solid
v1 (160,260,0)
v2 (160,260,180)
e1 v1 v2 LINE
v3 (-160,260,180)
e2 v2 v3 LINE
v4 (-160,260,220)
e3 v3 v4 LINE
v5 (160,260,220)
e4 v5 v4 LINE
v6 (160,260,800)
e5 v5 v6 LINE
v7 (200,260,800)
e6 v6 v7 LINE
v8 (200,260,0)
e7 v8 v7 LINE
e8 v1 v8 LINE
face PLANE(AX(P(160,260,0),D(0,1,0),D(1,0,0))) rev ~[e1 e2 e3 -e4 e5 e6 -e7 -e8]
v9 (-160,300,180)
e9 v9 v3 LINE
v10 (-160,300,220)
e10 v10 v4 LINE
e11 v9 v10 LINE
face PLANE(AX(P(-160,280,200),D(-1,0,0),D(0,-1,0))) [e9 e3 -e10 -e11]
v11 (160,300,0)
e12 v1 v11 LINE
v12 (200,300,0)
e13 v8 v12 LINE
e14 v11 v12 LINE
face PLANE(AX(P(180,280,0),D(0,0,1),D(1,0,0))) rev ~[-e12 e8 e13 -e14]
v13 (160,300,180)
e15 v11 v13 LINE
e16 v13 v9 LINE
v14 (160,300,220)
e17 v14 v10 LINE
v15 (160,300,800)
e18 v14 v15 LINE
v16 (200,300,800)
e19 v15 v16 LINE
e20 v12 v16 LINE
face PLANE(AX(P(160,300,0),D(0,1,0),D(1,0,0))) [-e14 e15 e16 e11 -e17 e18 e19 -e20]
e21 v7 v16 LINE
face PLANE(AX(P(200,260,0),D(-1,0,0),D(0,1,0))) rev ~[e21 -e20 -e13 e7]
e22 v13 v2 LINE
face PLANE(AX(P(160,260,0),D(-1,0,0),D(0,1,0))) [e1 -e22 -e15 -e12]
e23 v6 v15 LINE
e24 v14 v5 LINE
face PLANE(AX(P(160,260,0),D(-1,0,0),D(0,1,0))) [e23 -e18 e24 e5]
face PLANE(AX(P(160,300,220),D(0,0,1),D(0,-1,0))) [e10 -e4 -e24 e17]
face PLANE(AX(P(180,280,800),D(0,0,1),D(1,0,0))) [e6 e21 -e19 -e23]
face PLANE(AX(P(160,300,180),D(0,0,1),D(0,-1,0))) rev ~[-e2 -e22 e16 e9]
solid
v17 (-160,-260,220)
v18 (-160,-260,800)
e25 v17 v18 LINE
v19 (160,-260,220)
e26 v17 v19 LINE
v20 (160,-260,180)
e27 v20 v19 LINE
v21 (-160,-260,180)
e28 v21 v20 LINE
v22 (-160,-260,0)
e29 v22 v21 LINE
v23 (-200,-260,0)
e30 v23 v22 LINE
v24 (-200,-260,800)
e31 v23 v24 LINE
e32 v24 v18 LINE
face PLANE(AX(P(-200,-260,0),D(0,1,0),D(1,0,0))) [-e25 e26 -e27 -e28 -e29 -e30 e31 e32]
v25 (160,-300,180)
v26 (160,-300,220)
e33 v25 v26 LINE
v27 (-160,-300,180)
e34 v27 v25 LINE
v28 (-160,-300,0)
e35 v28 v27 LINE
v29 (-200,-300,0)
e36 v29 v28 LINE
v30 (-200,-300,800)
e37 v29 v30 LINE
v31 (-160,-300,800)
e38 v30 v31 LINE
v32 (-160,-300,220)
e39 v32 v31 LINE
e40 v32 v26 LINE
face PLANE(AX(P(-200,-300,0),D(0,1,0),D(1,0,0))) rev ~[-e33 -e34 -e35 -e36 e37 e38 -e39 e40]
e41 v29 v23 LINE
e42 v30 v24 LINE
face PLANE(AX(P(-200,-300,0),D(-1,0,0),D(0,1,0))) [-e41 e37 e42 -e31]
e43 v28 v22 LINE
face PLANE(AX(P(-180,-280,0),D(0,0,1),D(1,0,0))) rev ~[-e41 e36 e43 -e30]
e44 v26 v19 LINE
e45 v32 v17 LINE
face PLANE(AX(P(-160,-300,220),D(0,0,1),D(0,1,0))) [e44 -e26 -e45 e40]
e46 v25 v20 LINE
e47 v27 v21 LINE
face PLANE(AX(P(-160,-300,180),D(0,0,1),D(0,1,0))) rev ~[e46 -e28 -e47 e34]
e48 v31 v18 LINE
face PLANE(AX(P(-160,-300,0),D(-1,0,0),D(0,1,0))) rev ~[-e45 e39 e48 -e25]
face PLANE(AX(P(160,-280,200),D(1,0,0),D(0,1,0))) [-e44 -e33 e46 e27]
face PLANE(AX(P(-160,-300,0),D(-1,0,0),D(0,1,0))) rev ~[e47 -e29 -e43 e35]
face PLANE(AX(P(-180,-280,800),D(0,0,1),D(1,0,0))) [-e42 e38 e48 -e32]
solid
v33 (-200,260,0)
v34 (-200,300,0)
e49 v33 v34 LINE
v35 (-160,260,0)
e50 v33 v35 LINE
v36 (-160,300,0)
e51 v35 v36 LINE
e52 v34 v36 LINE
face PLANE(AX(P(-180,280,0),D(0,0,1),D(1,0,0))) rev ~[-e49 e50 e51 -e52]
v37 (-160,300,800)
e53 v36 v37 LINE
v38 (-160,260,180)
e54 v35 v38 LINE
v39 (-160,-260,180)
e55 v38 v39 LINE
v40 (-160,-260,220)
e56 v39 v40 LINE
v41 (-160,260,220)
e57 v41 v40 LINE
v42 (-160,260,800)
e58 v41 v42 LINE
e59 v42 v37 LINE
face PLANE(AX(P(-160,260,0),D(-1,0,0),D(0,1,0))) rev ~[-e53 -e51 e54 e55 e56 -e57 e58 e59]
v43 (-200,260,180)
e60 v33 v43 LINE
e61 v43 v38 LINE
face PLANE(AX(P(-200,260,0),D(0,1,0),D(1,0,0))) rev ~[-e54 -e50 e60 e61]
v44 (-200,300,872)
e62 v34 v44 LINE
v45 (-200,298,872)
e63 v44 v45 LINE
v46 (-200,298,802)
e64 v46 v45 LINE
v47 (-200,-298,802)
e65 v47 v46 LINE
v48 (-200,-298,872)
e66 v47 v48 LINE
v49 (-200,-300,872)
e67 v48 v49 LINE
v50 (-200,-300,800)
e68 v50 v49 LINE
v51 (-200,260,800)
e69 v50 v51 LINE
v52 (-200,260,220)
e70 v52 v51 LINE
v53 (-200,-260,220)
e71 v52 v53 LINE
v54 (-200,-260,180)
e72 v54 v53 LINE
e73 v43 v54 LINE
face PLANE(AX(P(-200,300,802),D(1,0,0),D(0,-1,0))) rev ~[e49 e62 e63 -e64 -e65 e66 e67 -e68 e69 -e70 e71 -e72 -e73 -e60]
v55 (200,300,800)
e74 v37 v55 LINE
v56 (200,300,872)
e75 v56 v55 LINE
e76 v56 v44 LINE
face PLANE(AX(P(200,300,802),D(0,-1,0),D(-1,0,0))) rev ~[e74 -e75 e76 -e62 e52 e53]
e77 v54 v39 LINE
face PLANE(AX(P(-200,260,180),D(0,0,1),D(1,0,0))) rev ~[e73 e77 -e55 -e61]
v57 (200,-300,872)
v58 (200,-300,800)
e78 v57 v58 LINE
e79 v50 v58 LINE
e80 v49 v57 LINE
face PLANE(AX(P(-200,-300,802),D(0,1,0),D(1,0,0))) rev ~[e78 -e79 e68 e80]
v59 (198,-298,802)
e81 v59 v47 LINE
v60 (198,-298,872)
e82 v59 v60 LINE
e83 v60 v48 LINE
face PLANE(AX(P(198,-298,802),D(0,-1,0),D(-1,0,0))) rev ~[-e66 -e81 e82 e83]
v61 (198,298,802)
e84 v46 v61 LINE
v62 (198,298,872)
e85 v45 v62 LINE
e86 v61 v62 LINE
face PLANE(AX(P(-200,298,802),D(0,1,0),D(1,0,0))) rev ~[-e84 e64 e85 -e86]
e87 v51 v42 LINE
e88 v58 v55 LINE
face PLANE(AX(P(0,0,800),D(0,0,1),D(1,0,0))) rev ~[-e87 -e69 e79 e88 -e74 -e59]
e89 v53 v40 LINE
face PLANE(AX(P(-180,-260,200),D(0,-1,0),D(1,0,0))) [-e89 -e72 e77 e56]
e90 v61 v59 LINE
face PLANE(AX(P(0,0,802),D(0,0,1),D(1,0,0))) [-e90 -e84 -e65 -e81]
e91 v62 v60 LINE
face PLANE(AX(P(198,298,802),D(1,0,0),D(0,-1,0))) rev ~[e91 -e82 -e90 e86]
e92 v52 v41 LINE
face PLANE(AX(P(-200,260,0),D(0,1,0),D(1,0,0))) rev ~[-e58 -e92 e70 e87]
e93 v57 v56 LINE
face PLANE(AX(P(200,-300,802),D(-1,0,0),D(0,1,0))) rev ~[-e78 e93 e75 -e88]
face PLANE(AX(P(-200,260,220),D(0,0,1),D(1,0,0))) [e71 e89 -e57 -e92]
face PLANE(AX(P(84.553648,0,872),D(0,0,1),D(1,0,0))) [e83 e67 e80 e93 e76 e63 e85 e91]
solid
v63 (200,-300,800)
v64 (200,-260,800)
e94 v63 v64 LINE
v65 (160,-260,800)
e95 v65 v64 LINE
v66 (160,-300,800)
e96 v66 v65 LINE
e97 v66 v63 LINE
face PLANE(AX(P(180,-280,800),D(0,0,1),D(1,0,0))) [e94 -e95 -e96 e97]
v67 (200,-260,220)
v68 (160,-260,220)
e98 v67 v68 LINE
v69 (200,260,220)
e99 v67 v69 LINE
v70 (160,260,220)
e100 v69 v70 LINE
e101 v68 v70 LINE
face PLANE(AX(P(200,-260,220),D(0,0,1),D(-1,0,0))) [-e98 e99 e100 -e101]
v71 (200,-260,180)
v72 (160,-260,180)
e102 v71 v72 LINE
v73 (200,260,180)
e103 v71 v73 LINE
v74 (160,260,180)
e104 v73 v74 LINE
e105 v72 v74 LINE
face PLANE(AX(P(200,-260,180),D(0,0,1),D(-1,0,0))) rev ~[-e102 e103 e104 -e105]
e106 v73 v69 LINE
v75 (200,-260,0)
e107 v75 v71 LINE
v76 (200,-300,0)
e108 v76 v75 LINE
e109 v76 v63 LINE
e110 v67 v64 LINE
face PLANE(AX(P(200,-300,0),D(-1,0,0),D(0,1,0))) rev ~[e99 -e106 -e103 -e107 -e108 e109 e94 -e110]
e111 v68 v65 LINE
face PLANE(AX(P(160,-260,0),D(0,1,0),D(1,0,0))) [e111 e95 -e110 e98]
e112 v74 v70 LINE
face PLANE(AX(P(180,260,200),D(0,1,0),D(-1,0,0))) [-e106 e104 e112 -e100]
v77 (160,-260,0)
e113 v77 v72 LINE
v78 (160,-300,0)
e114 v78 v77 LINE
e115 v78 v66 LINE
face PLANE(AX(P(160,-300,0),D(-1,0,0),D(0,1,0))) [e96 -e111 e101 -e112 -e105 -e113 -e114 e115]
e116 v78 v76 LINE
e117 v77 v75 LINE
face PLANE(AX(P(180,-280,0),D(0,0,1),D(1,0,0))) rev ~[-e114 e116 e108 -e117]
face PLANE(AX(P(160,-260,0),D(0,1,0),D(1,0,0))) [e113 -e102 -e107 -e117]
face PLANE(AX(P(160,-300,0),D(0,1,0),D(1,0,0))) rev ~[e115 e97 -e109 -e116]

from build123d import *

# Parameters (mm, degrees)
F0_W      = 40
F0_H      = 40
F1_DEPTH  = 800
F2_W      = 400
F2_H      = 600
F3_DEPTH  = 2
F5_DEPTH  = 70
F6_W      = 40
F6_H      = 40
F7_DEPTH  = 520
F8_W      = 40
F8_H      = 40
F9_DEPTH  = 320
F10_W     = 40
F10_H     = 40
F11_DEPTH = 520
F12_W     = 40
F12_H     = 40
F13_DEPTH = 320


with BuildPart() as f1:
    # F0 (on Top) → F1 (new body)
    with BuildSketch(Plane.XY):
        with Locations((-180, 280)):
            Rectangle(F0_W, F0_H)
    extrude(amount=F1_DEPTH)

    # F2 (on face) → F3 (join)
    with BuildSketch(Plane.XY.offset(800)):
        Rectangle(F2_W, F2_H)
    extrude(amount=F3_DEPTH)

    # F4 (on face) → F5 (join)
    with BuildSketch(Plane.XY.offset(802)):
        Polygon((200, 300), (-200, 300), (-200, 298), (198, 298), (198, -298), (-200, -298), (-200, -300), (200, -300), align=None)
    extrude(amount=F5_DEPTH)

    # F6 (on face) → F7 (join, through all)
    with BuildSketch(Plane.XZ.offset(-260)):
        with Locations((-180, 200)):
            Rectangle(F6_W, F6_H)
    extrude(amount=F7_DEPTH)


with BuildPart() as f1b:
    # F0 (on Top) → F1, piece 2 (new body)
    with BuildSketch(Plane.XY):
        with Locations((-180, -280)):
            Rectangle(F0_W, F0_H)
    extrude(amount=F1_DEPTH)

    # F8 (on face) → F9 (join, through all)
    with BuildSketch(Plane.YZ.offset(-160)):
        with Locations((-280, 200)):
            Rectangle(F8_W, F8_H)
    extrude(amount=F9_DEPTH)


with BuildPart() as f1c:
    # F0 (on Top) → F1, piece 3 (new body)
    with BuildSketch(Plane.XY):
        with Locations((180, 280)):
            Rectangle(F0_W, F0_H)
    extrude(amount=F1_DEPTH)

    # F12 (on face) → F13 (join, through all)
    with BuildSketch(Plane(origin=(160, 0, 0), x_dir=(0, -1, 0), z_dir=(-1, 0, 0))):
        with Locations((-280, 200)):
            Rectangle(F12_W, F12_H)
    extrude(amount=F13_DEPTH)


with BuildPart() as f1d:
    # F0 (on Top) → F1, piece 4 (new body)
    with BuildSketch(Plane.XY):
        with Locations((180, -280)):
            Rectangle(F0_W, F0_H)
    extrude(amount=F1_DEPTH)

    # F10 (on face) → F11 (join, through all)
    with BuildSketch(Plane(origin=(0, -260, 0), x_dir=(-1, 0, 0), z_dir=(0, 1, 0))):
        with Locations((-180, 200)):
            Rectangle(F10_W, F10_H)
    extrude(amount=F11_DEPTH)


solid = Compound([f1.part, f1b.part, f1c.part, f1d.part])
